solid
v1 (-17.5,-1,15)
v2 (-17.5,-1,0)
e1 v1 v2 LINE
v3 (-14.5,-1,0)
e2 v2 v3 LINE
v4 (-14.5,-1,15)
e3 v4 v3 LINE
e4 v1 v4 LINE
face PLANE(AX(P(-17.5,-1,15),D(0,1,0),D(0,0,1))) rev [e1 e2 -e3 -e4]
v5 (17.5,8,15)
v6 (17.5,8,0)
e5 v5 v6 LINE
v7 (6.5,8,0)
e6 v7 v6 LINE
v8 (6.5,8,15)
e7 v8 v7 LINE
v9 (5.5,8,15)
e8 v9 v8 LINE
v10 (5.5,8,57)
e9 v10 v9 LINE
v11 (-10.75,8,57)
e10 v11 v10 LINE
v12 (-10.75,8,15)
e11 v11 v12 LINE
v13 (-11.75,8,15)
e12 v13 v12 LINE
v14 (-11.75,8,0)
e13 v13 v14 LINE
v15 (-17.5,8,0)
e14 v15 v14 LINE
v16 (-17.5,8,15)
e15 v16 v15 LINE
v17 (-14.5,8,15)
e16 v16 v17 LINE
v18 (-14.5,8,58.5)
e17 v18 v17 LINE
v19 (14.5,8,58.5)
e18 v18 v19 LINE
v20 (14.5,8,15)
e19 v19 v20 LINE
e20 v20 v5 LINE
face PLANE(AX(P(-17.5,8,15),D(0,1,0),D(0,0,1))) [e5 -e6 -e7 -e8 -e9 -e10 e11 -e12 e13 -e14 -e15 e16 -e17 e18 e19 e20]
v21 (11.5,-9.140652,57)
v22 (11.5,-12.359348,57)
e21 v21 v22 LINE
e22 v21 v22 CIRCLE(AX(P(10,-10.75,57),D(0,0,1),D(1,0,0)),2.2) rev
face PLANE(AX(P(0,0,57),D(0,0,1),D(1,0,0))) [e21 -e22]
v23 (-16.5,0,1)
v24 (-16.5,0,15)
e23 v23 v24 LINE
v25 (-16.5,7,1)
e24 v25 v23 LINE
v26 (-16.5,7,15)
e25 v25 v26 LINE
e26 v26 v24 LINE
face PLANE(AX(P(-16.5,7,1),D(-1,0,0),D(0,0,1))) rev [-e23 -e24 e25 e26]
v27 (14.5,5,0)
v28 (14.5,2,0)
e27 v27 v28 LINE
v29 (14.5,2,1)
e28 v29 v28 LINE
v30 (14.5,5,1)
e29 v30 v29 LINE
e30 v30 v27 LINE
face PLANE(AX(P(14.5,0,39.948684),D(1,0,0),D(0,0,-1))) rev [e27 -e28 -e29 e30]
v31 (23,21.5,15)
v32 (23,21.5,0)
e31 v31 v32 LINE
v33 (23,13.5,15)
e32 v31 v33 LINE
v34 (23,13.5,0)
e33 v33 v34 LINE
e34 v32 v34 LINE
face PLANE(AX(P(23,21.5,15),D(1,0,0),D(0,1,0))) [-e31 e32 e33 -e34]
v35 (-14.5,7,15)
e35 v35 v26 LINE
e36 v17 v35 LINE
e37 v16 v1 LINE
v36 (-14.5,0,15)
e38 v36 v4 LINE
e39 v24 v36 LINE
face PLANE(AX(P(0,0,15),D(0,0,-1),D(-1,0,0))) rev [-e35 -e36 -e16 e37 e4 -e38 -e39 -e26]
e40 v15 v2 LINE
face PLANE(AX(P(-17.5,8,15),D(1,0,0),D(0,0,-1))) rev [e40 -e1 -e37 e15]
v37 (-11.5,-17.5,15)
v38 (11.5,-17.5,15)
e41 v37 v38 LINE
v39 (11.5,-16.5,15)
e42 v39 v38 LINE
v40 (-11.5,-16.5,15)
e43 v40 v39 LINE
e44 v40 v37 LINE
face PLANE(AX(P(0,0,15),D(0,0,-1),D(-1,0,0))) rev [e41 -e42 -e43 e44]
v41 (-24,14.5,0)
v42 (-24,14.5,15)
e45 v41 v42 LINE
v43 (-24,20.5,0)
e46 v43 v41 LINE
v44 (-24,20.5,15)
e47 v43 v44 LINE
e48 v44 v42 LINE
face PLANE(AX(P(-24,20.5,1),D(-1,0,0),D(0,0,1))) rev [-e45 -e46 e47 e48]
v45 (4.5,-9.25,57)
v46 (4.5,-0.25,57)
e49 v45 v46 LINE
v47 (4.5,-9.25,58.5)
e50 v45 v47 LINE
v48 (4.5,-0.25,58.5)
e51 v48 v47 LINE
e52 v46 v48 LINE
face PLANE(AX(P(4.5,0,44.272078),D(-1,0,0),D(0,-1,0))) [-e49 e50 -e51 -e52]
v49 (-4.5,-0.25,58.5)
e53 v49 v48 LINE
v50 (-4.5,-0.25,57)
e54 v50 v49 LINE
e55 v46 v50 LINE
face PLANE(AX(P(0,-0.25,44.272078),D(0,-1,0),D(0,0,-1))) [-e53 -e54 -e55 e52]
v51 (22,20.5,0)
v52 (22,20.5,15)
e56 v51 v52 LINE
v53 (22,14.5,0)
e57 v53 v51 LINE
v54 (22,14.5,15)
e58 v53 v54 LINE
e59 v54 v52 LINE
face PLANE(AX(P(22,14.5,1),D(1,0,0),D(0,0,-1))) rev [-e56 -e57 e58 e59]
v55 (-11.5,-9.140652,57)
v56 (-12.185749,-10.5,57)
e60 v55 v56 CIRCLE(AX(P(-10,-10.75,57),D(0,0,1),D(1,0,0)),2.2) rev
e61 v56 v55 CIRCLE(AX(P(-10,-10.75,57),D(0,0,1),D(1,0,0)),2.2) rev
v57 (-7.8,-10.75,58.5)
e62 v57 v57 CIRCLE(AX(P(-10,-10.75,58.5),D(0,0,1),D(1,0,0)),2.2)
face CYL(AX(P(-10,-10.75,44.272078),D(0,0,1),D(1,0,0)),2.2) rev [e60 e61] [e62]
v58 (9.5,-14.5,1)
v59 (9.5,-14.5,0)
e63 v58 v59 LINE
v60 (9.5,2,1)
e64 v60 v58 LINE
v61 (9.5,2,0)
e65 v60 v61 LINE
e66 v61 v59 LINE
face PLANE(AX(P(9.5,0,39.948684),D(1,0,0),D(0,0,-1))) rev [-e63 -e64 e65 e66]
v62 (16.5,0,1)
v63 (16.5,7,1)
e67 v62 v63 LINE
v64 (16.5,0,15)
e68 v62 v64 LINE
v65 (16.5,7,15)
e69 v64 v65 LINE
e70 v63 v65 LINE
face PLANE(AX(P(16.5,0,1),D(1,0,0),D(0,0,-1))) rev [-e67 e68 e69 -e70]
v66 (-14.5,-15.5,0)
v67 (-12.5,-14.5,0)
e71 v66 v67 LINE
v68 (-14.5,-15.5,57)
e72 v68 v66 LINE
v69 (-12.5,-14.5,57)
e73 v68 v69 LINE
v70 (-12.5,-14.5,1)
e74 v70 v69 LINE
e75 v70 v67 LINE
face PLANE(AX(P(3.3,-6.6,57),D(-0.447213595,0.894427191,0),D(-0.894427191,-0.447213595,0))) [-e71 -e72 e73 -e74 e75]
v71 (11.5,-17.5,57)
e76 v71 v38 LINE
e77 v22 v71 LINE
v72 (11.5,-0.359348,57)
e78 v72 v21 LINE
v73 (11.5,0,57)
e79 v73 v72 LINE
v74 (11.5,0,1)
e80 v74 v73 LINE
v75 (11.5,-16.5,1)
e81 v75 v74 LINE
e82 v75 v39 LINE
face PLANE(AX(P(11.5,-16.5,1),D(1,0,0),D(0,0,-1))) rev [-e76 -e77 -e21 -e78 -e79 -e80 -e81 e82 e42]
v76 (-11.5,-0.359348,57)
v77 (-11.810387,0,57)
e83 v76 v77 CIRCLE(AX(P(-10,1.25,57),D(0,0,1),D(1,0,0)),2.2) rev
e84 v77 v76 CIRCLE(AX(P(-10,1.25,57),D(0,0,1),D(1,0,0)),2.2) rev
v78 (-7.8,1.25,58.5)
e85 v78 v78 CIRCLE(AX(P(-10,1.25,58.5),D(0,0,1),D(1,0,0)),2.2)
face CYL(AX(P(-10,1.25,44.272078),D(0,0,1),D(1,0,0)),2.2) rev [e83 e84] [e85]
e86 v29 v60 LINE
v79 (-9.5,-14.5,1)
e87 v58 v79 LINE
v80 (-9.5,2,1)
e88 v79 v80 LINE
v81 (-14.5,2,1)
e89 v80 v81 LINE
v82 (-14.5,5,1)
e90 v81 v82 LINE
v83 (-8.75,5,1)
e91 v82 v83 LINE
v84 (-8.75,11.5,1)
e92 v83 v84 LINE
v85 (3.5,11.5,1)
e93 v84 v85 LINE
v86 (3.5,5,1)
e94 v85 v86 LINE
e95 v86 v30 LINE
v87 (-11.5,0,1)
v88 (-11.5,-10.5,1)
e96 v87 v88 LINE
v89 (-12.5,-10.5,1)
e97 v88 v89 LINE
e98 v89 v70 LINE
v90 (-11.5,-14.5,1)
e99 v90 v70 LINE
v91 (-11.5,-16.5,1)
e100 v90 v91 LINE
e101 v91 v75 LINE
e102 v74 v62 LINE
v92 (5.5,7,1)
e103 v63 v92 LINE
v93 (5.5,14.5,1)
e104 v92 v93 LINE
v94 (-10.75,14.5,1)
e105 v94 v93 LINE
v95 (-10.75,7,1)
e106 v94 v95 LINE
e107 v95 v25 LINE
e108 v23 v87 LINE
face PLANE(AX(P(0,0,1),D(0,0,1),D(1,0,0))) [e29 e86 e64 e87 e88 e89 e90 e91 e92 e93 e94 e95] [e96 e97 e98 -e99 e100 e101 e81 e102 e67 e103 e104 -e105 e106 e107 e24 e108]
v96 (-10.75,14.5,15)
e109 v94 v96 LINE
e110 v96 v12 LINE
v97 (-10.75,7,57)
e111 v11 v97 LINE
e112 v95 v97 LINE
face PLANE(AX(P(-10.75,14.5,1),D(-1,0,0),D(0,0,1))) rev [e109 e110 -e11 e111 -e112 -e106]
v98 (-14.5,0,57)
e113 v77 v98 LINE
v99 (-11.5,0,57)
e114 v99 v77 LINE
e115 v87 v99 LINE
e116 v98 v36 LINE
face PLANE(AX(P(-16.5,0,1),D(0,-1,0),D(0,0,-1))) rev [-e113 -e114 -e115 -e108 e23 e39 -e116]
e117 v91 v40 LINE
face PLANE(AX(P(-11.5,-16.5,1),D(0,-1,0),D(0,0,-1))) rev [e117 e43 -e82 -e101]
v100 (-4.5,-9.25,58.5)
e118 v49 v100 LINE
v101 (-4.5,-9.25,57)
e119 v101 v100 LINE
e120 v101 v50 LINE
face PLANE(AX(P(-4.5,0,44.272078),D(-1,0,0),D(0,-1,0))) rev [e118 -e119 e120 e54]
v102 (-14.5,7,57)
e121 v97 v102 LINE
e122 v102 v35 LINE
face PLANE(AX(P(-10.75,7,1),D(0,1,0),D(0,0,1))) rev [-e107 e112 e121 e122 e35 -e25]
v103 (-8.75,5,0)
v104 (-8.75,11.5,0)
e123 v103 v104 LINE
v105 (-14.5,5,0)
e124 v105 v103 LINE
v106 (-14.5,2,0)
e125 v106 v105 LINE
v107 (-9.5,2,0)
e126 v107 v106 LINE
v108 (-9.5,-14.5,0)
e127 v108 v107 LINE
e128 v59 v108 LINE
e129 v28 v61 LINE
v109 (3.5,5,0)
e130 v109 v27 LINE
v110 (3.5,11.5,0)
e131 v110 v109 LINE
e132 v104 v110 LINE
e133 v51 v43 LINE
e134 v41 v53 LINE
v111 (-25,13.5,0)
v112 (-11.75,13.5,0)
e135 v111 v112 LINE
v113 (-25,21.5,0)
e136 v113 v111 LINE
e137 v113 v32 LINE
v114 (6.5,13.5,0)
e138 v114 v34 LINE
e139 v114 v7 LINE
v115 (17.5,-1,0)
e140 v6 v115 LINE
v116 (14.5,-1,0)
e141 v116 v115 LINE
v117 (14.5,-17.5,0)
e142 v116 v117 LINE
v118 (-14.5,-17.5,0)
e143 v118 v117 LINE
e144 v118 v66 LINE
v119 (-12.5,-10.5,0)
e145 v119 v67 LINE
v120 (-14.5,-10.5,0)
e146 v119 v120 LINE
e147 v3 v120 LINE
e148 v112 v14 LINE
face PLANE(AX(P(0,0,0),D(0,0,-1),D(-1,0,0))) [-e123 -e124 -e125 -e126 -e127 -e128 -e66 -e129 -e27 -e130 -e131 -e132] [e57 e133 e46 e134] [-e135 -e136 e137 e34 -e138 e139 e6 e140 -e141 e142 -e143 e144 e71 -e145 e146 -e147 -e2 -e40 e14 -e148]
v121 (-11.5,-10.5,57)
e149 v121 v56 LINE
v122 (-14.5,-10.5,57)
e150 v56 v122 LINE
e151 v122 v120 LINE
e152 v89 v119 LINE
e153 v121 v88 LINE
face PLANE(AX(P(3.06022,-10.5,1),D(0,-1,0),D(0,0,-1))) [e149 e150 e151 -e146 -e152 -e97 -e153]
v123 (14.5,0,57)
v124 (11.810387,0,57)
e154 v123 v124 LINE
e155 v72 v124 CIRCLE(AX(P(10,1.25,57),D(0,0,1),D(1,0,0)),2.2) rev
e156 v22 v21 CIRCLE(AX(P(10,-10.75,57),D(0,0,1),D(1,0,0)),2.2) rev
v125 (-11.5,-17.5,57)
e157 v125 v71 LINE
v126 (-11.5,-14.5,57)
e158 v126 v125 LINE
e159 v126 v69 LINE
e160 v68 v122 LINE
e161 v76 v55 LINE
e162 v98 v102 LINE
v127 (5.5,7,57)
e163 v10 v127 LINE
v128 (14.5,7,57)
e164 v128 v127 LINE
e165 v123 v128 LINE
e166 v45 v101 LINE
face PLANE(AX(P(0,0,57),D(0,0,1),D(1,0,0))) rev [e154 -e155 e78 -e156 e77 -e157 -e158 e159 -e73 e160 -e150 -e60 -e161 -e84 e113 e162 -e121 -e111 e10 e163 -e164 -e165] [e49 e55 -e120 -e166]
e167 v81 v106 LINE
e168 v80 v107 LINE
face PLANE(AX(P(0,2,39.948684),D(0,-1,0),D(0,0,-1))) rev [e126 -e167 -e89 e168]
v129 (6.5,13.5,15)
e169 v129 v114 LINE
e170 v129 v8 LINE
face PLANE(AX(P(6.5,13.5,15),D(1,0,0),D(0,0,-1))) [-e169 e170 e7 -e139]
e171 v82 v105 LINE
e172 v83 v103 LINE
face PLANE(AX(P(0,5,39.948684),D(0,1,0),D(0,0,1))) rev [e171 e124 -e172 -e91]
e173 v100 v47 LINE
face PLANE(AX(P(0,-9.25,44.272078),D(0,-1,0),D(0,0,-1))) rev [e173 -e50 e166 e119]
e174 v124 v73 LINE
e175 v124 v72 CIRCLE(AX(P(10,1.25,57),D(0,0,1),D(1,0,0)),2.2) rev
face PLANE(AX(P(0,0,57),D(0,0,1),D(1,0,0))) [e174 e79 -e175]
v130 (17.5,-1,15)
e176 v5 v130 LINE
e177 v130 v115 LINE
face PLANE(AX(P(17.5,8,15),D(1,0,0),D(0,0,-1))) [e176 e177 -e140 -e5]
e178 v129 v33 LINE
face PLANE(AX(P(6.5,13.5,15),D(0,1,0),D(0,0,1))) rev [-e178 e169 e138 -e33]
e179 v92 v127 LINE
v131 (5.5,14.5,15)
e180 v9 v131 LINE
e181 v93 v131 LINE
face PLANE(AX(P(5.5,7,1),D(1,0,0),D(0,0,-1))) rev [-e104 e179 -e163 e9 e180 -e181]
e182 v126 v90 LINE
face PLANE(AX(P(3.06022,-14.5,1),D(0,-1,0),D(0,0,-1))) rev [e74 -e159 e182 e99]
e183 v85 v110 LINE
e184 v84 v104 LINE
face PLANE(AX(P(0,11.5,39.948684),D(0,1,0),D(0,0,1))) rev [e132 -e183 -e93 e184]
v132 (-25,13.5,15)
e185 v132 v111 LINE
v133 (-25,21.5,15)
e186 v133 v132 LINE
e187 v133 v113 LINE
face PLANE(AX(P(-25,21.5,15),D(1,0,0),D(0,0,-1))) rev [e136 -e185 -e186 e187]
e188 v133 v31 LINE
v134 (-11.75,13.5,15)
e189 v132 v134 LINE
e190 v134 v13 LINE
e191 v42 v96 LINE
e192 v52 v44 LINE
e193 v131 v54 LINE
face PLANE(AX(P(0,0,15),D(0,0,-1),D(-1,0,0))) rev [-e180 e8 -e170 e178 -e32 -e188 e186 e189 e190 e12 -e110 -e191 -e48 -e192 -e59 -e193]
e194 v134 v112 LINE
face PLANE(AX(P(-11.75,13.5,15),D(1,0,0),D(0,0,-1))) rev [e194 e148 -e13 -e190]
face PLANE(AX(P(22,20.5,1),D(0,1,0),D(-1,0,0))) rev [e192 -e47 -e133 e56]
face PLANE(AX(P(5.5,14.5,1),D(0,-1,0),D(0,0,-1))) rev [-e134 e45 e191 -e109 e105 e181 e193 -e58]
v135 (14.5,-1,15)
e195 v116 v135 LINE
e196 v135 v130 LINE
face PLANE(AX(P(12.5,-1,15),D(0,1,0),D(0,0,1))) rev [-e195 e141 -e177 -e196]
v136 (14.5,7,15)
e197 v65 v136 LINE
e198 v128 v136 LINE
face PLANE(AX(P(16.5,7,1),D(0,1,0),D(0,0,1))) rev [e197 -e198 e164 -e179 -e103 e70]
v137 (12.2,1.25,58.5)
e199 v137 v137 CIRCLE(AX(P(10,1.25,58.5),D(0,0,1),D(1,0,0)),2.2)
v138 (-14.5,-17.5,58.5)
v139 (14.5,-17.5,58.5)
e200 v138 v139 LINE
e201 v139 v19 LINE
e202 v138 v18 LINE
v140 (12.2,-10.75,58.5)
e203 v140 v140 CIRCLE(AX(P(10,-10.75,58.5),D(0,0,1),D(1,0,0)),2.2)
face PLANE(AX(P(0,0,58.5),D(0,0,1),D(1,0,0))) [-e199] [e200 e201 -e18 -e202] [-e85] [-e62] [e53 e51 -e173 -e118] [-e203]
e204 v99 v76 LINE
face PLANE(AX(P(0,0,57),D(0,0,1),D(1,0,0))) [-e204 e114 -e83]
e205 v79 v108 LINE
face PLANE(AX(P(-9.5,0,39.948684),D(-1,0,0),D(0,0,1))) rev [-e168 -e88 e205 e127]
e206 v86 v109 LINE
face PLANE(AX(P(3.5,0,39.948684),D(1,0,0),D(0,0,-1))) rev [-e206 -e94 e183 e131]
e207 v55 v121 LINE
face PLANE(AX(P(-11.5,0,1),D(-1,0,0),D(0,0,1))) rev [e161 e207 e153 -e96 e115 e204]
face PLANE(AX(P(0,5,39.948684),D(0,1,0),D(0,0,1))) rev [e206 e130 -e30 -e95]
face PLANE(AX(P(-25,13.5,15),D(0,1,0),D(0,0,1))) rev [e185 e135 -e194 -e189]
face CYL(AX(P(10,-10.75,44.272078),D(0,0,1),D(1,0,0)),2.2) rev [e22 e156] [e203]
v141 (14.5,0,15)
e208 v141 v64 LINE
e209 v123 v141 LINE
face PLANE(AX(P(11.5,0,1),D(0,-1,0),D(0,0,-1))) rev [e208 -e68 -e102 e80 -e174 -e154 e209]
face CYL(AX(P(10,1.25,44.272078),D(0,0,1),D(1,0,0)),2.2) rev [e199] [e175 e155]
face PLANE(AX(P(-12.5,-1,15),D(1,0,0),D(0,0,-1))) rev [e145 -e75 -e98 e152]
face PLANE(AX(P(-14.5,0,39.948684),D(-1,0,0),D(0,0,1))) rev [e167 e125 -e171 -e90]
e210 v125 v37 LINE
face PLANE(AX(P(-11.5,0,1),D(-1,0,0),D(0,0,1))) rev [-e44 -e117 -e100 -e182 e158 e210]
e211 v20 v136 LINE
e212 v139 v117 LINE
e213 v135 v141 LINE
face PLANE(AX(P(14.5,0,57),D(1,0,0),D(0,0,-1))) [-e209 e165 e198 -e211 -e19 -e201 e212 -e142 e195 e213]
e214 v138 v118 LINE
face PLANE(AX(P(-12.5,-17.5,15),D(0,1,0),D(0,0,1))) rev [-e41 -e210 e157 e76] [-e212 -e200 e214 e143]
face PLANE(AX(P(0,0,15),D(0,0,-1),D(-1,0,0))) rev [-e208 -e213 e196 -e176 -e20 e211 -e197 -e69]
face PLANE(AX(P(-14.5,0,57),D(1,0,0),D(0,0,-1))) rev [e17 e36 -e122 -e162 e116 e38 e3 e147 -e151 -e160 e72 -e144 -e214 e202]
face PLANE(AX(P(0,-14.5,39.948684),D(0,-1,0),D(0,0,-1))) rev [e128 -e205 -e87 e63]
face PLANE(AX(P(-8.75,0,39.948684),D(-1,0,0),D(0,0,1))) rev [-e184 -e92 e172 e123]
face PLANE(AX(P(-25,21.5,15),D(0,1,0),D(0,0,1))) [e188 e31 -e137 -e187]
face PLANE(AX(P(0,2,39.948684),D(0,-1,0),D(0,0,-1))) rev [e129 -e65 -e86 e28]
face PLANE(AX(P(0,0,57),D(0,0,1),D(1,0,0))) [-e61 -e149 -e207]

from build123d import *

# Parameters (mm, degrees)
EXTRUDE_1_DEPTH        = 15
CUT_EXTRUDE_1_DEPTH    = 14
SKETCH_7_W             = 46
SKETCH_7_H             = 6
CUT_EXTRUDE_2_DEPTH    = 1
SKETCH_8_W             = 14
SKETCH_8_H             = 4
CUT_EXTRUDE_3_DEPTH    = 1
CUT_EXTRUDE_6_DEPTH    = 1
EXTRUDE_START          = -57
EXTRUDE_10_OUTLINE_W   = 3
EXTRUDE_10_OUTLINE_H   = 17.5
EXTRUDE_10_OUTLINE_H_2 = 10.5
EXTRUDE_10_OUTLINE_W_2 = 9
EXTRUDE_10_OUTLINE_H_3 = 1
EXTRUDE_10_OUTLINE_W_3 = 2
EXTRUDE_10_DEPTH       = 57
SKETCH_29_W            = 29
SKETCH_29_H            = 25.5
EXTRUDE_12_DEPTH       = 1.5
SKETCH_30_R            = 2.2
SKETCH_30_W            = 9
SKETCH_30_H            = 9
CUT_EXTRUDE_8_DEPTH    = 1.5
SKETCH_31_W            = 1.75
SKETCH_31_H            = 1
EXTRUDE_13_DEPTH       = 42


# Read off the part's stored shape, not the designer's step: 凸台-拉伸10
with BuildPart() as part:
    # 草图3 → 凸台-拉伸1 (new body)
    with BuildSketch(Plane.XY):
        Polygon((-25, 21.5), (23, 21.5), (23, 13.5), (6.5, 13.5), (6.5, 8), (17.5, 8), (17.5, -1), (12.5, -1), (12.5, -17.5), (-12.5, -17.5), (-12.5, -1), (-17.5, -1), (-17.5, 8), (-11.75, 8), (-11.75, 13.5), (-25, 13.5), align=None)
    extrude(amount=EXTRUDE_1_DEPTH)

    # 草图4 → 切除-拉伸1 (cut)
    with BuildSketch(Plane.XY.offset(15)):
        Polygon((22, 20.5), (-24, 20.5), (-24, 14.5), (-10.75, 14.5), (-10.75, 7), (-16.5, 7), (-16.5, 0), (-11.5, 0), (-11.5, -16.5), (11.5, -16.5), (11.5, 0), (16.5, 0), (16.5, 7), (5.5, 7), (5.5, 14.5), (22, 14.5), align=None)
    extrude(amount=-CUT_EXTRUDE_1_DEPTH, mode=Mode.SUBTRACT)

    # 草图7 → 切除-拉伸2 (cut)
    with BuildSketch(Plane.XY.offset(1)):
        with Locations((-1, 17.5)):
            Rectangle(SKETCH_7_W, SKETCH_7_H)
    extrude(amount=-CUT_EXTRUDE_2_DEPTH, mode=Mode.SUBTRACT)

    # 草图8 → 切除-拉伸3 (cut)
    with BuildSketch(Plane.ZY.offset(12.5)):
        with Locations((8, -12.5)):
            Rectangle(SKETCH_8_W, SKETCH_8_H)
    extrude(amount=-CUT_EXTRUDE_3_DEPTH, mode=Mode.SUBTRACT)

    # 草图9 → 切除-拉伸6 (cut)
    with BuildSketch(Plane(origin=(0, 0, 0), x_dir=(-1, 0, 0), z_dir=(0, 0, -1))):
        Polygon((-3.5, 11.5), (-3.5, 5), (-14.5, 5), (-14.5, 2), (-9.5, 2), (-9.5, -14.5), (9.5, -14.5), (9.5, 2), (14.5, 2), (14.5, 5), (8.75, 5), (8.75, 11.5), align=None)
    extrude(amount=-CUT_EXTRUDE_6_DEPTH, mode=Mode.SUBTRACT)

    # 凸台-拉伸10 outline → 凸台-拉伸10 (add)
    with BuildSketch(Plane(origin=(0, 0, 0), x_dir=(-1, 0, 0), z_dir=(0, 0, -1)).offset(EXTRUDE_START)):
        with Locations((-13, -8.75)):
            Rectangle(EXTRUDE_10_OUTLINE_W, EXTRUDE_10_OUTLINE_H)
        Polygon((14.5, -15.5), (12.5, -14.5), (11.5, -14.5), (11.5, -17.5), (14.5, -17.5), align=None)
        with Locations((13, -5.25)):
            Rectangle(EXTRUDE_10_OUTLINE_W, EXTRUDE_10_OUTLINE_H_2)
        with Locations((-10, 7.5)):
            Rectangle(EXTRUDE_10_OUTLINE_W_2, EXTRUDE_10_OUTLINE_H_3)
        with Locations((13.5, 7.5)):
            Rectangle(EXTRUDE_10_OUTLINE_W_3, EXTRUDE_10_OUTLINE_H_3)
    extrude(amount=EXTRUDE_10_DEPTH)

    # 草图29 → 凸台-拉伸12 (add)
    with BuildSketch(Plane.XY.offset(57)):
        with Locations((0, -4.75)):
            Rectangle(SKETCH_29_W, SKETCH_29_H)
    extrude(amount=EXTRUDE_12_DEPTH)

    # 草图30 → 切除-拉伸8 (cut)
    with BuildSketch(Plane.XY.offset(58.5)):
        with Locations((-10, 1.25)):
            Circle(SKETCH_30_R)
        with Locations((-10, -10.75)):
            Circle(SKETCH_30_R)
        with Locations((10, 1.25)):
            Circle(SKETCH_30_R)
        with Locations((10, -10.75)):
            Circle(SKETCH_30_R)
        with Locations((0, -4.75)):
            Rectangle(SKETCH_30_W, SKETCH_30_H)
    extrude(amount=-CUT_EXTRUDE_8_DEPTH, mode=Mode.SUBTRACT)

    # 草图31 → 凸台-拉伸13 (add)
    with BuildSketch(Plane.XY.offset(15)):
        with Locations((-11.625, 7.5)):
            Rectangle(SKETCH_31_W, SKETCH_31_H)
    extrude(amount=EXTRUDE_13_DEPTH)


solid = part.part
